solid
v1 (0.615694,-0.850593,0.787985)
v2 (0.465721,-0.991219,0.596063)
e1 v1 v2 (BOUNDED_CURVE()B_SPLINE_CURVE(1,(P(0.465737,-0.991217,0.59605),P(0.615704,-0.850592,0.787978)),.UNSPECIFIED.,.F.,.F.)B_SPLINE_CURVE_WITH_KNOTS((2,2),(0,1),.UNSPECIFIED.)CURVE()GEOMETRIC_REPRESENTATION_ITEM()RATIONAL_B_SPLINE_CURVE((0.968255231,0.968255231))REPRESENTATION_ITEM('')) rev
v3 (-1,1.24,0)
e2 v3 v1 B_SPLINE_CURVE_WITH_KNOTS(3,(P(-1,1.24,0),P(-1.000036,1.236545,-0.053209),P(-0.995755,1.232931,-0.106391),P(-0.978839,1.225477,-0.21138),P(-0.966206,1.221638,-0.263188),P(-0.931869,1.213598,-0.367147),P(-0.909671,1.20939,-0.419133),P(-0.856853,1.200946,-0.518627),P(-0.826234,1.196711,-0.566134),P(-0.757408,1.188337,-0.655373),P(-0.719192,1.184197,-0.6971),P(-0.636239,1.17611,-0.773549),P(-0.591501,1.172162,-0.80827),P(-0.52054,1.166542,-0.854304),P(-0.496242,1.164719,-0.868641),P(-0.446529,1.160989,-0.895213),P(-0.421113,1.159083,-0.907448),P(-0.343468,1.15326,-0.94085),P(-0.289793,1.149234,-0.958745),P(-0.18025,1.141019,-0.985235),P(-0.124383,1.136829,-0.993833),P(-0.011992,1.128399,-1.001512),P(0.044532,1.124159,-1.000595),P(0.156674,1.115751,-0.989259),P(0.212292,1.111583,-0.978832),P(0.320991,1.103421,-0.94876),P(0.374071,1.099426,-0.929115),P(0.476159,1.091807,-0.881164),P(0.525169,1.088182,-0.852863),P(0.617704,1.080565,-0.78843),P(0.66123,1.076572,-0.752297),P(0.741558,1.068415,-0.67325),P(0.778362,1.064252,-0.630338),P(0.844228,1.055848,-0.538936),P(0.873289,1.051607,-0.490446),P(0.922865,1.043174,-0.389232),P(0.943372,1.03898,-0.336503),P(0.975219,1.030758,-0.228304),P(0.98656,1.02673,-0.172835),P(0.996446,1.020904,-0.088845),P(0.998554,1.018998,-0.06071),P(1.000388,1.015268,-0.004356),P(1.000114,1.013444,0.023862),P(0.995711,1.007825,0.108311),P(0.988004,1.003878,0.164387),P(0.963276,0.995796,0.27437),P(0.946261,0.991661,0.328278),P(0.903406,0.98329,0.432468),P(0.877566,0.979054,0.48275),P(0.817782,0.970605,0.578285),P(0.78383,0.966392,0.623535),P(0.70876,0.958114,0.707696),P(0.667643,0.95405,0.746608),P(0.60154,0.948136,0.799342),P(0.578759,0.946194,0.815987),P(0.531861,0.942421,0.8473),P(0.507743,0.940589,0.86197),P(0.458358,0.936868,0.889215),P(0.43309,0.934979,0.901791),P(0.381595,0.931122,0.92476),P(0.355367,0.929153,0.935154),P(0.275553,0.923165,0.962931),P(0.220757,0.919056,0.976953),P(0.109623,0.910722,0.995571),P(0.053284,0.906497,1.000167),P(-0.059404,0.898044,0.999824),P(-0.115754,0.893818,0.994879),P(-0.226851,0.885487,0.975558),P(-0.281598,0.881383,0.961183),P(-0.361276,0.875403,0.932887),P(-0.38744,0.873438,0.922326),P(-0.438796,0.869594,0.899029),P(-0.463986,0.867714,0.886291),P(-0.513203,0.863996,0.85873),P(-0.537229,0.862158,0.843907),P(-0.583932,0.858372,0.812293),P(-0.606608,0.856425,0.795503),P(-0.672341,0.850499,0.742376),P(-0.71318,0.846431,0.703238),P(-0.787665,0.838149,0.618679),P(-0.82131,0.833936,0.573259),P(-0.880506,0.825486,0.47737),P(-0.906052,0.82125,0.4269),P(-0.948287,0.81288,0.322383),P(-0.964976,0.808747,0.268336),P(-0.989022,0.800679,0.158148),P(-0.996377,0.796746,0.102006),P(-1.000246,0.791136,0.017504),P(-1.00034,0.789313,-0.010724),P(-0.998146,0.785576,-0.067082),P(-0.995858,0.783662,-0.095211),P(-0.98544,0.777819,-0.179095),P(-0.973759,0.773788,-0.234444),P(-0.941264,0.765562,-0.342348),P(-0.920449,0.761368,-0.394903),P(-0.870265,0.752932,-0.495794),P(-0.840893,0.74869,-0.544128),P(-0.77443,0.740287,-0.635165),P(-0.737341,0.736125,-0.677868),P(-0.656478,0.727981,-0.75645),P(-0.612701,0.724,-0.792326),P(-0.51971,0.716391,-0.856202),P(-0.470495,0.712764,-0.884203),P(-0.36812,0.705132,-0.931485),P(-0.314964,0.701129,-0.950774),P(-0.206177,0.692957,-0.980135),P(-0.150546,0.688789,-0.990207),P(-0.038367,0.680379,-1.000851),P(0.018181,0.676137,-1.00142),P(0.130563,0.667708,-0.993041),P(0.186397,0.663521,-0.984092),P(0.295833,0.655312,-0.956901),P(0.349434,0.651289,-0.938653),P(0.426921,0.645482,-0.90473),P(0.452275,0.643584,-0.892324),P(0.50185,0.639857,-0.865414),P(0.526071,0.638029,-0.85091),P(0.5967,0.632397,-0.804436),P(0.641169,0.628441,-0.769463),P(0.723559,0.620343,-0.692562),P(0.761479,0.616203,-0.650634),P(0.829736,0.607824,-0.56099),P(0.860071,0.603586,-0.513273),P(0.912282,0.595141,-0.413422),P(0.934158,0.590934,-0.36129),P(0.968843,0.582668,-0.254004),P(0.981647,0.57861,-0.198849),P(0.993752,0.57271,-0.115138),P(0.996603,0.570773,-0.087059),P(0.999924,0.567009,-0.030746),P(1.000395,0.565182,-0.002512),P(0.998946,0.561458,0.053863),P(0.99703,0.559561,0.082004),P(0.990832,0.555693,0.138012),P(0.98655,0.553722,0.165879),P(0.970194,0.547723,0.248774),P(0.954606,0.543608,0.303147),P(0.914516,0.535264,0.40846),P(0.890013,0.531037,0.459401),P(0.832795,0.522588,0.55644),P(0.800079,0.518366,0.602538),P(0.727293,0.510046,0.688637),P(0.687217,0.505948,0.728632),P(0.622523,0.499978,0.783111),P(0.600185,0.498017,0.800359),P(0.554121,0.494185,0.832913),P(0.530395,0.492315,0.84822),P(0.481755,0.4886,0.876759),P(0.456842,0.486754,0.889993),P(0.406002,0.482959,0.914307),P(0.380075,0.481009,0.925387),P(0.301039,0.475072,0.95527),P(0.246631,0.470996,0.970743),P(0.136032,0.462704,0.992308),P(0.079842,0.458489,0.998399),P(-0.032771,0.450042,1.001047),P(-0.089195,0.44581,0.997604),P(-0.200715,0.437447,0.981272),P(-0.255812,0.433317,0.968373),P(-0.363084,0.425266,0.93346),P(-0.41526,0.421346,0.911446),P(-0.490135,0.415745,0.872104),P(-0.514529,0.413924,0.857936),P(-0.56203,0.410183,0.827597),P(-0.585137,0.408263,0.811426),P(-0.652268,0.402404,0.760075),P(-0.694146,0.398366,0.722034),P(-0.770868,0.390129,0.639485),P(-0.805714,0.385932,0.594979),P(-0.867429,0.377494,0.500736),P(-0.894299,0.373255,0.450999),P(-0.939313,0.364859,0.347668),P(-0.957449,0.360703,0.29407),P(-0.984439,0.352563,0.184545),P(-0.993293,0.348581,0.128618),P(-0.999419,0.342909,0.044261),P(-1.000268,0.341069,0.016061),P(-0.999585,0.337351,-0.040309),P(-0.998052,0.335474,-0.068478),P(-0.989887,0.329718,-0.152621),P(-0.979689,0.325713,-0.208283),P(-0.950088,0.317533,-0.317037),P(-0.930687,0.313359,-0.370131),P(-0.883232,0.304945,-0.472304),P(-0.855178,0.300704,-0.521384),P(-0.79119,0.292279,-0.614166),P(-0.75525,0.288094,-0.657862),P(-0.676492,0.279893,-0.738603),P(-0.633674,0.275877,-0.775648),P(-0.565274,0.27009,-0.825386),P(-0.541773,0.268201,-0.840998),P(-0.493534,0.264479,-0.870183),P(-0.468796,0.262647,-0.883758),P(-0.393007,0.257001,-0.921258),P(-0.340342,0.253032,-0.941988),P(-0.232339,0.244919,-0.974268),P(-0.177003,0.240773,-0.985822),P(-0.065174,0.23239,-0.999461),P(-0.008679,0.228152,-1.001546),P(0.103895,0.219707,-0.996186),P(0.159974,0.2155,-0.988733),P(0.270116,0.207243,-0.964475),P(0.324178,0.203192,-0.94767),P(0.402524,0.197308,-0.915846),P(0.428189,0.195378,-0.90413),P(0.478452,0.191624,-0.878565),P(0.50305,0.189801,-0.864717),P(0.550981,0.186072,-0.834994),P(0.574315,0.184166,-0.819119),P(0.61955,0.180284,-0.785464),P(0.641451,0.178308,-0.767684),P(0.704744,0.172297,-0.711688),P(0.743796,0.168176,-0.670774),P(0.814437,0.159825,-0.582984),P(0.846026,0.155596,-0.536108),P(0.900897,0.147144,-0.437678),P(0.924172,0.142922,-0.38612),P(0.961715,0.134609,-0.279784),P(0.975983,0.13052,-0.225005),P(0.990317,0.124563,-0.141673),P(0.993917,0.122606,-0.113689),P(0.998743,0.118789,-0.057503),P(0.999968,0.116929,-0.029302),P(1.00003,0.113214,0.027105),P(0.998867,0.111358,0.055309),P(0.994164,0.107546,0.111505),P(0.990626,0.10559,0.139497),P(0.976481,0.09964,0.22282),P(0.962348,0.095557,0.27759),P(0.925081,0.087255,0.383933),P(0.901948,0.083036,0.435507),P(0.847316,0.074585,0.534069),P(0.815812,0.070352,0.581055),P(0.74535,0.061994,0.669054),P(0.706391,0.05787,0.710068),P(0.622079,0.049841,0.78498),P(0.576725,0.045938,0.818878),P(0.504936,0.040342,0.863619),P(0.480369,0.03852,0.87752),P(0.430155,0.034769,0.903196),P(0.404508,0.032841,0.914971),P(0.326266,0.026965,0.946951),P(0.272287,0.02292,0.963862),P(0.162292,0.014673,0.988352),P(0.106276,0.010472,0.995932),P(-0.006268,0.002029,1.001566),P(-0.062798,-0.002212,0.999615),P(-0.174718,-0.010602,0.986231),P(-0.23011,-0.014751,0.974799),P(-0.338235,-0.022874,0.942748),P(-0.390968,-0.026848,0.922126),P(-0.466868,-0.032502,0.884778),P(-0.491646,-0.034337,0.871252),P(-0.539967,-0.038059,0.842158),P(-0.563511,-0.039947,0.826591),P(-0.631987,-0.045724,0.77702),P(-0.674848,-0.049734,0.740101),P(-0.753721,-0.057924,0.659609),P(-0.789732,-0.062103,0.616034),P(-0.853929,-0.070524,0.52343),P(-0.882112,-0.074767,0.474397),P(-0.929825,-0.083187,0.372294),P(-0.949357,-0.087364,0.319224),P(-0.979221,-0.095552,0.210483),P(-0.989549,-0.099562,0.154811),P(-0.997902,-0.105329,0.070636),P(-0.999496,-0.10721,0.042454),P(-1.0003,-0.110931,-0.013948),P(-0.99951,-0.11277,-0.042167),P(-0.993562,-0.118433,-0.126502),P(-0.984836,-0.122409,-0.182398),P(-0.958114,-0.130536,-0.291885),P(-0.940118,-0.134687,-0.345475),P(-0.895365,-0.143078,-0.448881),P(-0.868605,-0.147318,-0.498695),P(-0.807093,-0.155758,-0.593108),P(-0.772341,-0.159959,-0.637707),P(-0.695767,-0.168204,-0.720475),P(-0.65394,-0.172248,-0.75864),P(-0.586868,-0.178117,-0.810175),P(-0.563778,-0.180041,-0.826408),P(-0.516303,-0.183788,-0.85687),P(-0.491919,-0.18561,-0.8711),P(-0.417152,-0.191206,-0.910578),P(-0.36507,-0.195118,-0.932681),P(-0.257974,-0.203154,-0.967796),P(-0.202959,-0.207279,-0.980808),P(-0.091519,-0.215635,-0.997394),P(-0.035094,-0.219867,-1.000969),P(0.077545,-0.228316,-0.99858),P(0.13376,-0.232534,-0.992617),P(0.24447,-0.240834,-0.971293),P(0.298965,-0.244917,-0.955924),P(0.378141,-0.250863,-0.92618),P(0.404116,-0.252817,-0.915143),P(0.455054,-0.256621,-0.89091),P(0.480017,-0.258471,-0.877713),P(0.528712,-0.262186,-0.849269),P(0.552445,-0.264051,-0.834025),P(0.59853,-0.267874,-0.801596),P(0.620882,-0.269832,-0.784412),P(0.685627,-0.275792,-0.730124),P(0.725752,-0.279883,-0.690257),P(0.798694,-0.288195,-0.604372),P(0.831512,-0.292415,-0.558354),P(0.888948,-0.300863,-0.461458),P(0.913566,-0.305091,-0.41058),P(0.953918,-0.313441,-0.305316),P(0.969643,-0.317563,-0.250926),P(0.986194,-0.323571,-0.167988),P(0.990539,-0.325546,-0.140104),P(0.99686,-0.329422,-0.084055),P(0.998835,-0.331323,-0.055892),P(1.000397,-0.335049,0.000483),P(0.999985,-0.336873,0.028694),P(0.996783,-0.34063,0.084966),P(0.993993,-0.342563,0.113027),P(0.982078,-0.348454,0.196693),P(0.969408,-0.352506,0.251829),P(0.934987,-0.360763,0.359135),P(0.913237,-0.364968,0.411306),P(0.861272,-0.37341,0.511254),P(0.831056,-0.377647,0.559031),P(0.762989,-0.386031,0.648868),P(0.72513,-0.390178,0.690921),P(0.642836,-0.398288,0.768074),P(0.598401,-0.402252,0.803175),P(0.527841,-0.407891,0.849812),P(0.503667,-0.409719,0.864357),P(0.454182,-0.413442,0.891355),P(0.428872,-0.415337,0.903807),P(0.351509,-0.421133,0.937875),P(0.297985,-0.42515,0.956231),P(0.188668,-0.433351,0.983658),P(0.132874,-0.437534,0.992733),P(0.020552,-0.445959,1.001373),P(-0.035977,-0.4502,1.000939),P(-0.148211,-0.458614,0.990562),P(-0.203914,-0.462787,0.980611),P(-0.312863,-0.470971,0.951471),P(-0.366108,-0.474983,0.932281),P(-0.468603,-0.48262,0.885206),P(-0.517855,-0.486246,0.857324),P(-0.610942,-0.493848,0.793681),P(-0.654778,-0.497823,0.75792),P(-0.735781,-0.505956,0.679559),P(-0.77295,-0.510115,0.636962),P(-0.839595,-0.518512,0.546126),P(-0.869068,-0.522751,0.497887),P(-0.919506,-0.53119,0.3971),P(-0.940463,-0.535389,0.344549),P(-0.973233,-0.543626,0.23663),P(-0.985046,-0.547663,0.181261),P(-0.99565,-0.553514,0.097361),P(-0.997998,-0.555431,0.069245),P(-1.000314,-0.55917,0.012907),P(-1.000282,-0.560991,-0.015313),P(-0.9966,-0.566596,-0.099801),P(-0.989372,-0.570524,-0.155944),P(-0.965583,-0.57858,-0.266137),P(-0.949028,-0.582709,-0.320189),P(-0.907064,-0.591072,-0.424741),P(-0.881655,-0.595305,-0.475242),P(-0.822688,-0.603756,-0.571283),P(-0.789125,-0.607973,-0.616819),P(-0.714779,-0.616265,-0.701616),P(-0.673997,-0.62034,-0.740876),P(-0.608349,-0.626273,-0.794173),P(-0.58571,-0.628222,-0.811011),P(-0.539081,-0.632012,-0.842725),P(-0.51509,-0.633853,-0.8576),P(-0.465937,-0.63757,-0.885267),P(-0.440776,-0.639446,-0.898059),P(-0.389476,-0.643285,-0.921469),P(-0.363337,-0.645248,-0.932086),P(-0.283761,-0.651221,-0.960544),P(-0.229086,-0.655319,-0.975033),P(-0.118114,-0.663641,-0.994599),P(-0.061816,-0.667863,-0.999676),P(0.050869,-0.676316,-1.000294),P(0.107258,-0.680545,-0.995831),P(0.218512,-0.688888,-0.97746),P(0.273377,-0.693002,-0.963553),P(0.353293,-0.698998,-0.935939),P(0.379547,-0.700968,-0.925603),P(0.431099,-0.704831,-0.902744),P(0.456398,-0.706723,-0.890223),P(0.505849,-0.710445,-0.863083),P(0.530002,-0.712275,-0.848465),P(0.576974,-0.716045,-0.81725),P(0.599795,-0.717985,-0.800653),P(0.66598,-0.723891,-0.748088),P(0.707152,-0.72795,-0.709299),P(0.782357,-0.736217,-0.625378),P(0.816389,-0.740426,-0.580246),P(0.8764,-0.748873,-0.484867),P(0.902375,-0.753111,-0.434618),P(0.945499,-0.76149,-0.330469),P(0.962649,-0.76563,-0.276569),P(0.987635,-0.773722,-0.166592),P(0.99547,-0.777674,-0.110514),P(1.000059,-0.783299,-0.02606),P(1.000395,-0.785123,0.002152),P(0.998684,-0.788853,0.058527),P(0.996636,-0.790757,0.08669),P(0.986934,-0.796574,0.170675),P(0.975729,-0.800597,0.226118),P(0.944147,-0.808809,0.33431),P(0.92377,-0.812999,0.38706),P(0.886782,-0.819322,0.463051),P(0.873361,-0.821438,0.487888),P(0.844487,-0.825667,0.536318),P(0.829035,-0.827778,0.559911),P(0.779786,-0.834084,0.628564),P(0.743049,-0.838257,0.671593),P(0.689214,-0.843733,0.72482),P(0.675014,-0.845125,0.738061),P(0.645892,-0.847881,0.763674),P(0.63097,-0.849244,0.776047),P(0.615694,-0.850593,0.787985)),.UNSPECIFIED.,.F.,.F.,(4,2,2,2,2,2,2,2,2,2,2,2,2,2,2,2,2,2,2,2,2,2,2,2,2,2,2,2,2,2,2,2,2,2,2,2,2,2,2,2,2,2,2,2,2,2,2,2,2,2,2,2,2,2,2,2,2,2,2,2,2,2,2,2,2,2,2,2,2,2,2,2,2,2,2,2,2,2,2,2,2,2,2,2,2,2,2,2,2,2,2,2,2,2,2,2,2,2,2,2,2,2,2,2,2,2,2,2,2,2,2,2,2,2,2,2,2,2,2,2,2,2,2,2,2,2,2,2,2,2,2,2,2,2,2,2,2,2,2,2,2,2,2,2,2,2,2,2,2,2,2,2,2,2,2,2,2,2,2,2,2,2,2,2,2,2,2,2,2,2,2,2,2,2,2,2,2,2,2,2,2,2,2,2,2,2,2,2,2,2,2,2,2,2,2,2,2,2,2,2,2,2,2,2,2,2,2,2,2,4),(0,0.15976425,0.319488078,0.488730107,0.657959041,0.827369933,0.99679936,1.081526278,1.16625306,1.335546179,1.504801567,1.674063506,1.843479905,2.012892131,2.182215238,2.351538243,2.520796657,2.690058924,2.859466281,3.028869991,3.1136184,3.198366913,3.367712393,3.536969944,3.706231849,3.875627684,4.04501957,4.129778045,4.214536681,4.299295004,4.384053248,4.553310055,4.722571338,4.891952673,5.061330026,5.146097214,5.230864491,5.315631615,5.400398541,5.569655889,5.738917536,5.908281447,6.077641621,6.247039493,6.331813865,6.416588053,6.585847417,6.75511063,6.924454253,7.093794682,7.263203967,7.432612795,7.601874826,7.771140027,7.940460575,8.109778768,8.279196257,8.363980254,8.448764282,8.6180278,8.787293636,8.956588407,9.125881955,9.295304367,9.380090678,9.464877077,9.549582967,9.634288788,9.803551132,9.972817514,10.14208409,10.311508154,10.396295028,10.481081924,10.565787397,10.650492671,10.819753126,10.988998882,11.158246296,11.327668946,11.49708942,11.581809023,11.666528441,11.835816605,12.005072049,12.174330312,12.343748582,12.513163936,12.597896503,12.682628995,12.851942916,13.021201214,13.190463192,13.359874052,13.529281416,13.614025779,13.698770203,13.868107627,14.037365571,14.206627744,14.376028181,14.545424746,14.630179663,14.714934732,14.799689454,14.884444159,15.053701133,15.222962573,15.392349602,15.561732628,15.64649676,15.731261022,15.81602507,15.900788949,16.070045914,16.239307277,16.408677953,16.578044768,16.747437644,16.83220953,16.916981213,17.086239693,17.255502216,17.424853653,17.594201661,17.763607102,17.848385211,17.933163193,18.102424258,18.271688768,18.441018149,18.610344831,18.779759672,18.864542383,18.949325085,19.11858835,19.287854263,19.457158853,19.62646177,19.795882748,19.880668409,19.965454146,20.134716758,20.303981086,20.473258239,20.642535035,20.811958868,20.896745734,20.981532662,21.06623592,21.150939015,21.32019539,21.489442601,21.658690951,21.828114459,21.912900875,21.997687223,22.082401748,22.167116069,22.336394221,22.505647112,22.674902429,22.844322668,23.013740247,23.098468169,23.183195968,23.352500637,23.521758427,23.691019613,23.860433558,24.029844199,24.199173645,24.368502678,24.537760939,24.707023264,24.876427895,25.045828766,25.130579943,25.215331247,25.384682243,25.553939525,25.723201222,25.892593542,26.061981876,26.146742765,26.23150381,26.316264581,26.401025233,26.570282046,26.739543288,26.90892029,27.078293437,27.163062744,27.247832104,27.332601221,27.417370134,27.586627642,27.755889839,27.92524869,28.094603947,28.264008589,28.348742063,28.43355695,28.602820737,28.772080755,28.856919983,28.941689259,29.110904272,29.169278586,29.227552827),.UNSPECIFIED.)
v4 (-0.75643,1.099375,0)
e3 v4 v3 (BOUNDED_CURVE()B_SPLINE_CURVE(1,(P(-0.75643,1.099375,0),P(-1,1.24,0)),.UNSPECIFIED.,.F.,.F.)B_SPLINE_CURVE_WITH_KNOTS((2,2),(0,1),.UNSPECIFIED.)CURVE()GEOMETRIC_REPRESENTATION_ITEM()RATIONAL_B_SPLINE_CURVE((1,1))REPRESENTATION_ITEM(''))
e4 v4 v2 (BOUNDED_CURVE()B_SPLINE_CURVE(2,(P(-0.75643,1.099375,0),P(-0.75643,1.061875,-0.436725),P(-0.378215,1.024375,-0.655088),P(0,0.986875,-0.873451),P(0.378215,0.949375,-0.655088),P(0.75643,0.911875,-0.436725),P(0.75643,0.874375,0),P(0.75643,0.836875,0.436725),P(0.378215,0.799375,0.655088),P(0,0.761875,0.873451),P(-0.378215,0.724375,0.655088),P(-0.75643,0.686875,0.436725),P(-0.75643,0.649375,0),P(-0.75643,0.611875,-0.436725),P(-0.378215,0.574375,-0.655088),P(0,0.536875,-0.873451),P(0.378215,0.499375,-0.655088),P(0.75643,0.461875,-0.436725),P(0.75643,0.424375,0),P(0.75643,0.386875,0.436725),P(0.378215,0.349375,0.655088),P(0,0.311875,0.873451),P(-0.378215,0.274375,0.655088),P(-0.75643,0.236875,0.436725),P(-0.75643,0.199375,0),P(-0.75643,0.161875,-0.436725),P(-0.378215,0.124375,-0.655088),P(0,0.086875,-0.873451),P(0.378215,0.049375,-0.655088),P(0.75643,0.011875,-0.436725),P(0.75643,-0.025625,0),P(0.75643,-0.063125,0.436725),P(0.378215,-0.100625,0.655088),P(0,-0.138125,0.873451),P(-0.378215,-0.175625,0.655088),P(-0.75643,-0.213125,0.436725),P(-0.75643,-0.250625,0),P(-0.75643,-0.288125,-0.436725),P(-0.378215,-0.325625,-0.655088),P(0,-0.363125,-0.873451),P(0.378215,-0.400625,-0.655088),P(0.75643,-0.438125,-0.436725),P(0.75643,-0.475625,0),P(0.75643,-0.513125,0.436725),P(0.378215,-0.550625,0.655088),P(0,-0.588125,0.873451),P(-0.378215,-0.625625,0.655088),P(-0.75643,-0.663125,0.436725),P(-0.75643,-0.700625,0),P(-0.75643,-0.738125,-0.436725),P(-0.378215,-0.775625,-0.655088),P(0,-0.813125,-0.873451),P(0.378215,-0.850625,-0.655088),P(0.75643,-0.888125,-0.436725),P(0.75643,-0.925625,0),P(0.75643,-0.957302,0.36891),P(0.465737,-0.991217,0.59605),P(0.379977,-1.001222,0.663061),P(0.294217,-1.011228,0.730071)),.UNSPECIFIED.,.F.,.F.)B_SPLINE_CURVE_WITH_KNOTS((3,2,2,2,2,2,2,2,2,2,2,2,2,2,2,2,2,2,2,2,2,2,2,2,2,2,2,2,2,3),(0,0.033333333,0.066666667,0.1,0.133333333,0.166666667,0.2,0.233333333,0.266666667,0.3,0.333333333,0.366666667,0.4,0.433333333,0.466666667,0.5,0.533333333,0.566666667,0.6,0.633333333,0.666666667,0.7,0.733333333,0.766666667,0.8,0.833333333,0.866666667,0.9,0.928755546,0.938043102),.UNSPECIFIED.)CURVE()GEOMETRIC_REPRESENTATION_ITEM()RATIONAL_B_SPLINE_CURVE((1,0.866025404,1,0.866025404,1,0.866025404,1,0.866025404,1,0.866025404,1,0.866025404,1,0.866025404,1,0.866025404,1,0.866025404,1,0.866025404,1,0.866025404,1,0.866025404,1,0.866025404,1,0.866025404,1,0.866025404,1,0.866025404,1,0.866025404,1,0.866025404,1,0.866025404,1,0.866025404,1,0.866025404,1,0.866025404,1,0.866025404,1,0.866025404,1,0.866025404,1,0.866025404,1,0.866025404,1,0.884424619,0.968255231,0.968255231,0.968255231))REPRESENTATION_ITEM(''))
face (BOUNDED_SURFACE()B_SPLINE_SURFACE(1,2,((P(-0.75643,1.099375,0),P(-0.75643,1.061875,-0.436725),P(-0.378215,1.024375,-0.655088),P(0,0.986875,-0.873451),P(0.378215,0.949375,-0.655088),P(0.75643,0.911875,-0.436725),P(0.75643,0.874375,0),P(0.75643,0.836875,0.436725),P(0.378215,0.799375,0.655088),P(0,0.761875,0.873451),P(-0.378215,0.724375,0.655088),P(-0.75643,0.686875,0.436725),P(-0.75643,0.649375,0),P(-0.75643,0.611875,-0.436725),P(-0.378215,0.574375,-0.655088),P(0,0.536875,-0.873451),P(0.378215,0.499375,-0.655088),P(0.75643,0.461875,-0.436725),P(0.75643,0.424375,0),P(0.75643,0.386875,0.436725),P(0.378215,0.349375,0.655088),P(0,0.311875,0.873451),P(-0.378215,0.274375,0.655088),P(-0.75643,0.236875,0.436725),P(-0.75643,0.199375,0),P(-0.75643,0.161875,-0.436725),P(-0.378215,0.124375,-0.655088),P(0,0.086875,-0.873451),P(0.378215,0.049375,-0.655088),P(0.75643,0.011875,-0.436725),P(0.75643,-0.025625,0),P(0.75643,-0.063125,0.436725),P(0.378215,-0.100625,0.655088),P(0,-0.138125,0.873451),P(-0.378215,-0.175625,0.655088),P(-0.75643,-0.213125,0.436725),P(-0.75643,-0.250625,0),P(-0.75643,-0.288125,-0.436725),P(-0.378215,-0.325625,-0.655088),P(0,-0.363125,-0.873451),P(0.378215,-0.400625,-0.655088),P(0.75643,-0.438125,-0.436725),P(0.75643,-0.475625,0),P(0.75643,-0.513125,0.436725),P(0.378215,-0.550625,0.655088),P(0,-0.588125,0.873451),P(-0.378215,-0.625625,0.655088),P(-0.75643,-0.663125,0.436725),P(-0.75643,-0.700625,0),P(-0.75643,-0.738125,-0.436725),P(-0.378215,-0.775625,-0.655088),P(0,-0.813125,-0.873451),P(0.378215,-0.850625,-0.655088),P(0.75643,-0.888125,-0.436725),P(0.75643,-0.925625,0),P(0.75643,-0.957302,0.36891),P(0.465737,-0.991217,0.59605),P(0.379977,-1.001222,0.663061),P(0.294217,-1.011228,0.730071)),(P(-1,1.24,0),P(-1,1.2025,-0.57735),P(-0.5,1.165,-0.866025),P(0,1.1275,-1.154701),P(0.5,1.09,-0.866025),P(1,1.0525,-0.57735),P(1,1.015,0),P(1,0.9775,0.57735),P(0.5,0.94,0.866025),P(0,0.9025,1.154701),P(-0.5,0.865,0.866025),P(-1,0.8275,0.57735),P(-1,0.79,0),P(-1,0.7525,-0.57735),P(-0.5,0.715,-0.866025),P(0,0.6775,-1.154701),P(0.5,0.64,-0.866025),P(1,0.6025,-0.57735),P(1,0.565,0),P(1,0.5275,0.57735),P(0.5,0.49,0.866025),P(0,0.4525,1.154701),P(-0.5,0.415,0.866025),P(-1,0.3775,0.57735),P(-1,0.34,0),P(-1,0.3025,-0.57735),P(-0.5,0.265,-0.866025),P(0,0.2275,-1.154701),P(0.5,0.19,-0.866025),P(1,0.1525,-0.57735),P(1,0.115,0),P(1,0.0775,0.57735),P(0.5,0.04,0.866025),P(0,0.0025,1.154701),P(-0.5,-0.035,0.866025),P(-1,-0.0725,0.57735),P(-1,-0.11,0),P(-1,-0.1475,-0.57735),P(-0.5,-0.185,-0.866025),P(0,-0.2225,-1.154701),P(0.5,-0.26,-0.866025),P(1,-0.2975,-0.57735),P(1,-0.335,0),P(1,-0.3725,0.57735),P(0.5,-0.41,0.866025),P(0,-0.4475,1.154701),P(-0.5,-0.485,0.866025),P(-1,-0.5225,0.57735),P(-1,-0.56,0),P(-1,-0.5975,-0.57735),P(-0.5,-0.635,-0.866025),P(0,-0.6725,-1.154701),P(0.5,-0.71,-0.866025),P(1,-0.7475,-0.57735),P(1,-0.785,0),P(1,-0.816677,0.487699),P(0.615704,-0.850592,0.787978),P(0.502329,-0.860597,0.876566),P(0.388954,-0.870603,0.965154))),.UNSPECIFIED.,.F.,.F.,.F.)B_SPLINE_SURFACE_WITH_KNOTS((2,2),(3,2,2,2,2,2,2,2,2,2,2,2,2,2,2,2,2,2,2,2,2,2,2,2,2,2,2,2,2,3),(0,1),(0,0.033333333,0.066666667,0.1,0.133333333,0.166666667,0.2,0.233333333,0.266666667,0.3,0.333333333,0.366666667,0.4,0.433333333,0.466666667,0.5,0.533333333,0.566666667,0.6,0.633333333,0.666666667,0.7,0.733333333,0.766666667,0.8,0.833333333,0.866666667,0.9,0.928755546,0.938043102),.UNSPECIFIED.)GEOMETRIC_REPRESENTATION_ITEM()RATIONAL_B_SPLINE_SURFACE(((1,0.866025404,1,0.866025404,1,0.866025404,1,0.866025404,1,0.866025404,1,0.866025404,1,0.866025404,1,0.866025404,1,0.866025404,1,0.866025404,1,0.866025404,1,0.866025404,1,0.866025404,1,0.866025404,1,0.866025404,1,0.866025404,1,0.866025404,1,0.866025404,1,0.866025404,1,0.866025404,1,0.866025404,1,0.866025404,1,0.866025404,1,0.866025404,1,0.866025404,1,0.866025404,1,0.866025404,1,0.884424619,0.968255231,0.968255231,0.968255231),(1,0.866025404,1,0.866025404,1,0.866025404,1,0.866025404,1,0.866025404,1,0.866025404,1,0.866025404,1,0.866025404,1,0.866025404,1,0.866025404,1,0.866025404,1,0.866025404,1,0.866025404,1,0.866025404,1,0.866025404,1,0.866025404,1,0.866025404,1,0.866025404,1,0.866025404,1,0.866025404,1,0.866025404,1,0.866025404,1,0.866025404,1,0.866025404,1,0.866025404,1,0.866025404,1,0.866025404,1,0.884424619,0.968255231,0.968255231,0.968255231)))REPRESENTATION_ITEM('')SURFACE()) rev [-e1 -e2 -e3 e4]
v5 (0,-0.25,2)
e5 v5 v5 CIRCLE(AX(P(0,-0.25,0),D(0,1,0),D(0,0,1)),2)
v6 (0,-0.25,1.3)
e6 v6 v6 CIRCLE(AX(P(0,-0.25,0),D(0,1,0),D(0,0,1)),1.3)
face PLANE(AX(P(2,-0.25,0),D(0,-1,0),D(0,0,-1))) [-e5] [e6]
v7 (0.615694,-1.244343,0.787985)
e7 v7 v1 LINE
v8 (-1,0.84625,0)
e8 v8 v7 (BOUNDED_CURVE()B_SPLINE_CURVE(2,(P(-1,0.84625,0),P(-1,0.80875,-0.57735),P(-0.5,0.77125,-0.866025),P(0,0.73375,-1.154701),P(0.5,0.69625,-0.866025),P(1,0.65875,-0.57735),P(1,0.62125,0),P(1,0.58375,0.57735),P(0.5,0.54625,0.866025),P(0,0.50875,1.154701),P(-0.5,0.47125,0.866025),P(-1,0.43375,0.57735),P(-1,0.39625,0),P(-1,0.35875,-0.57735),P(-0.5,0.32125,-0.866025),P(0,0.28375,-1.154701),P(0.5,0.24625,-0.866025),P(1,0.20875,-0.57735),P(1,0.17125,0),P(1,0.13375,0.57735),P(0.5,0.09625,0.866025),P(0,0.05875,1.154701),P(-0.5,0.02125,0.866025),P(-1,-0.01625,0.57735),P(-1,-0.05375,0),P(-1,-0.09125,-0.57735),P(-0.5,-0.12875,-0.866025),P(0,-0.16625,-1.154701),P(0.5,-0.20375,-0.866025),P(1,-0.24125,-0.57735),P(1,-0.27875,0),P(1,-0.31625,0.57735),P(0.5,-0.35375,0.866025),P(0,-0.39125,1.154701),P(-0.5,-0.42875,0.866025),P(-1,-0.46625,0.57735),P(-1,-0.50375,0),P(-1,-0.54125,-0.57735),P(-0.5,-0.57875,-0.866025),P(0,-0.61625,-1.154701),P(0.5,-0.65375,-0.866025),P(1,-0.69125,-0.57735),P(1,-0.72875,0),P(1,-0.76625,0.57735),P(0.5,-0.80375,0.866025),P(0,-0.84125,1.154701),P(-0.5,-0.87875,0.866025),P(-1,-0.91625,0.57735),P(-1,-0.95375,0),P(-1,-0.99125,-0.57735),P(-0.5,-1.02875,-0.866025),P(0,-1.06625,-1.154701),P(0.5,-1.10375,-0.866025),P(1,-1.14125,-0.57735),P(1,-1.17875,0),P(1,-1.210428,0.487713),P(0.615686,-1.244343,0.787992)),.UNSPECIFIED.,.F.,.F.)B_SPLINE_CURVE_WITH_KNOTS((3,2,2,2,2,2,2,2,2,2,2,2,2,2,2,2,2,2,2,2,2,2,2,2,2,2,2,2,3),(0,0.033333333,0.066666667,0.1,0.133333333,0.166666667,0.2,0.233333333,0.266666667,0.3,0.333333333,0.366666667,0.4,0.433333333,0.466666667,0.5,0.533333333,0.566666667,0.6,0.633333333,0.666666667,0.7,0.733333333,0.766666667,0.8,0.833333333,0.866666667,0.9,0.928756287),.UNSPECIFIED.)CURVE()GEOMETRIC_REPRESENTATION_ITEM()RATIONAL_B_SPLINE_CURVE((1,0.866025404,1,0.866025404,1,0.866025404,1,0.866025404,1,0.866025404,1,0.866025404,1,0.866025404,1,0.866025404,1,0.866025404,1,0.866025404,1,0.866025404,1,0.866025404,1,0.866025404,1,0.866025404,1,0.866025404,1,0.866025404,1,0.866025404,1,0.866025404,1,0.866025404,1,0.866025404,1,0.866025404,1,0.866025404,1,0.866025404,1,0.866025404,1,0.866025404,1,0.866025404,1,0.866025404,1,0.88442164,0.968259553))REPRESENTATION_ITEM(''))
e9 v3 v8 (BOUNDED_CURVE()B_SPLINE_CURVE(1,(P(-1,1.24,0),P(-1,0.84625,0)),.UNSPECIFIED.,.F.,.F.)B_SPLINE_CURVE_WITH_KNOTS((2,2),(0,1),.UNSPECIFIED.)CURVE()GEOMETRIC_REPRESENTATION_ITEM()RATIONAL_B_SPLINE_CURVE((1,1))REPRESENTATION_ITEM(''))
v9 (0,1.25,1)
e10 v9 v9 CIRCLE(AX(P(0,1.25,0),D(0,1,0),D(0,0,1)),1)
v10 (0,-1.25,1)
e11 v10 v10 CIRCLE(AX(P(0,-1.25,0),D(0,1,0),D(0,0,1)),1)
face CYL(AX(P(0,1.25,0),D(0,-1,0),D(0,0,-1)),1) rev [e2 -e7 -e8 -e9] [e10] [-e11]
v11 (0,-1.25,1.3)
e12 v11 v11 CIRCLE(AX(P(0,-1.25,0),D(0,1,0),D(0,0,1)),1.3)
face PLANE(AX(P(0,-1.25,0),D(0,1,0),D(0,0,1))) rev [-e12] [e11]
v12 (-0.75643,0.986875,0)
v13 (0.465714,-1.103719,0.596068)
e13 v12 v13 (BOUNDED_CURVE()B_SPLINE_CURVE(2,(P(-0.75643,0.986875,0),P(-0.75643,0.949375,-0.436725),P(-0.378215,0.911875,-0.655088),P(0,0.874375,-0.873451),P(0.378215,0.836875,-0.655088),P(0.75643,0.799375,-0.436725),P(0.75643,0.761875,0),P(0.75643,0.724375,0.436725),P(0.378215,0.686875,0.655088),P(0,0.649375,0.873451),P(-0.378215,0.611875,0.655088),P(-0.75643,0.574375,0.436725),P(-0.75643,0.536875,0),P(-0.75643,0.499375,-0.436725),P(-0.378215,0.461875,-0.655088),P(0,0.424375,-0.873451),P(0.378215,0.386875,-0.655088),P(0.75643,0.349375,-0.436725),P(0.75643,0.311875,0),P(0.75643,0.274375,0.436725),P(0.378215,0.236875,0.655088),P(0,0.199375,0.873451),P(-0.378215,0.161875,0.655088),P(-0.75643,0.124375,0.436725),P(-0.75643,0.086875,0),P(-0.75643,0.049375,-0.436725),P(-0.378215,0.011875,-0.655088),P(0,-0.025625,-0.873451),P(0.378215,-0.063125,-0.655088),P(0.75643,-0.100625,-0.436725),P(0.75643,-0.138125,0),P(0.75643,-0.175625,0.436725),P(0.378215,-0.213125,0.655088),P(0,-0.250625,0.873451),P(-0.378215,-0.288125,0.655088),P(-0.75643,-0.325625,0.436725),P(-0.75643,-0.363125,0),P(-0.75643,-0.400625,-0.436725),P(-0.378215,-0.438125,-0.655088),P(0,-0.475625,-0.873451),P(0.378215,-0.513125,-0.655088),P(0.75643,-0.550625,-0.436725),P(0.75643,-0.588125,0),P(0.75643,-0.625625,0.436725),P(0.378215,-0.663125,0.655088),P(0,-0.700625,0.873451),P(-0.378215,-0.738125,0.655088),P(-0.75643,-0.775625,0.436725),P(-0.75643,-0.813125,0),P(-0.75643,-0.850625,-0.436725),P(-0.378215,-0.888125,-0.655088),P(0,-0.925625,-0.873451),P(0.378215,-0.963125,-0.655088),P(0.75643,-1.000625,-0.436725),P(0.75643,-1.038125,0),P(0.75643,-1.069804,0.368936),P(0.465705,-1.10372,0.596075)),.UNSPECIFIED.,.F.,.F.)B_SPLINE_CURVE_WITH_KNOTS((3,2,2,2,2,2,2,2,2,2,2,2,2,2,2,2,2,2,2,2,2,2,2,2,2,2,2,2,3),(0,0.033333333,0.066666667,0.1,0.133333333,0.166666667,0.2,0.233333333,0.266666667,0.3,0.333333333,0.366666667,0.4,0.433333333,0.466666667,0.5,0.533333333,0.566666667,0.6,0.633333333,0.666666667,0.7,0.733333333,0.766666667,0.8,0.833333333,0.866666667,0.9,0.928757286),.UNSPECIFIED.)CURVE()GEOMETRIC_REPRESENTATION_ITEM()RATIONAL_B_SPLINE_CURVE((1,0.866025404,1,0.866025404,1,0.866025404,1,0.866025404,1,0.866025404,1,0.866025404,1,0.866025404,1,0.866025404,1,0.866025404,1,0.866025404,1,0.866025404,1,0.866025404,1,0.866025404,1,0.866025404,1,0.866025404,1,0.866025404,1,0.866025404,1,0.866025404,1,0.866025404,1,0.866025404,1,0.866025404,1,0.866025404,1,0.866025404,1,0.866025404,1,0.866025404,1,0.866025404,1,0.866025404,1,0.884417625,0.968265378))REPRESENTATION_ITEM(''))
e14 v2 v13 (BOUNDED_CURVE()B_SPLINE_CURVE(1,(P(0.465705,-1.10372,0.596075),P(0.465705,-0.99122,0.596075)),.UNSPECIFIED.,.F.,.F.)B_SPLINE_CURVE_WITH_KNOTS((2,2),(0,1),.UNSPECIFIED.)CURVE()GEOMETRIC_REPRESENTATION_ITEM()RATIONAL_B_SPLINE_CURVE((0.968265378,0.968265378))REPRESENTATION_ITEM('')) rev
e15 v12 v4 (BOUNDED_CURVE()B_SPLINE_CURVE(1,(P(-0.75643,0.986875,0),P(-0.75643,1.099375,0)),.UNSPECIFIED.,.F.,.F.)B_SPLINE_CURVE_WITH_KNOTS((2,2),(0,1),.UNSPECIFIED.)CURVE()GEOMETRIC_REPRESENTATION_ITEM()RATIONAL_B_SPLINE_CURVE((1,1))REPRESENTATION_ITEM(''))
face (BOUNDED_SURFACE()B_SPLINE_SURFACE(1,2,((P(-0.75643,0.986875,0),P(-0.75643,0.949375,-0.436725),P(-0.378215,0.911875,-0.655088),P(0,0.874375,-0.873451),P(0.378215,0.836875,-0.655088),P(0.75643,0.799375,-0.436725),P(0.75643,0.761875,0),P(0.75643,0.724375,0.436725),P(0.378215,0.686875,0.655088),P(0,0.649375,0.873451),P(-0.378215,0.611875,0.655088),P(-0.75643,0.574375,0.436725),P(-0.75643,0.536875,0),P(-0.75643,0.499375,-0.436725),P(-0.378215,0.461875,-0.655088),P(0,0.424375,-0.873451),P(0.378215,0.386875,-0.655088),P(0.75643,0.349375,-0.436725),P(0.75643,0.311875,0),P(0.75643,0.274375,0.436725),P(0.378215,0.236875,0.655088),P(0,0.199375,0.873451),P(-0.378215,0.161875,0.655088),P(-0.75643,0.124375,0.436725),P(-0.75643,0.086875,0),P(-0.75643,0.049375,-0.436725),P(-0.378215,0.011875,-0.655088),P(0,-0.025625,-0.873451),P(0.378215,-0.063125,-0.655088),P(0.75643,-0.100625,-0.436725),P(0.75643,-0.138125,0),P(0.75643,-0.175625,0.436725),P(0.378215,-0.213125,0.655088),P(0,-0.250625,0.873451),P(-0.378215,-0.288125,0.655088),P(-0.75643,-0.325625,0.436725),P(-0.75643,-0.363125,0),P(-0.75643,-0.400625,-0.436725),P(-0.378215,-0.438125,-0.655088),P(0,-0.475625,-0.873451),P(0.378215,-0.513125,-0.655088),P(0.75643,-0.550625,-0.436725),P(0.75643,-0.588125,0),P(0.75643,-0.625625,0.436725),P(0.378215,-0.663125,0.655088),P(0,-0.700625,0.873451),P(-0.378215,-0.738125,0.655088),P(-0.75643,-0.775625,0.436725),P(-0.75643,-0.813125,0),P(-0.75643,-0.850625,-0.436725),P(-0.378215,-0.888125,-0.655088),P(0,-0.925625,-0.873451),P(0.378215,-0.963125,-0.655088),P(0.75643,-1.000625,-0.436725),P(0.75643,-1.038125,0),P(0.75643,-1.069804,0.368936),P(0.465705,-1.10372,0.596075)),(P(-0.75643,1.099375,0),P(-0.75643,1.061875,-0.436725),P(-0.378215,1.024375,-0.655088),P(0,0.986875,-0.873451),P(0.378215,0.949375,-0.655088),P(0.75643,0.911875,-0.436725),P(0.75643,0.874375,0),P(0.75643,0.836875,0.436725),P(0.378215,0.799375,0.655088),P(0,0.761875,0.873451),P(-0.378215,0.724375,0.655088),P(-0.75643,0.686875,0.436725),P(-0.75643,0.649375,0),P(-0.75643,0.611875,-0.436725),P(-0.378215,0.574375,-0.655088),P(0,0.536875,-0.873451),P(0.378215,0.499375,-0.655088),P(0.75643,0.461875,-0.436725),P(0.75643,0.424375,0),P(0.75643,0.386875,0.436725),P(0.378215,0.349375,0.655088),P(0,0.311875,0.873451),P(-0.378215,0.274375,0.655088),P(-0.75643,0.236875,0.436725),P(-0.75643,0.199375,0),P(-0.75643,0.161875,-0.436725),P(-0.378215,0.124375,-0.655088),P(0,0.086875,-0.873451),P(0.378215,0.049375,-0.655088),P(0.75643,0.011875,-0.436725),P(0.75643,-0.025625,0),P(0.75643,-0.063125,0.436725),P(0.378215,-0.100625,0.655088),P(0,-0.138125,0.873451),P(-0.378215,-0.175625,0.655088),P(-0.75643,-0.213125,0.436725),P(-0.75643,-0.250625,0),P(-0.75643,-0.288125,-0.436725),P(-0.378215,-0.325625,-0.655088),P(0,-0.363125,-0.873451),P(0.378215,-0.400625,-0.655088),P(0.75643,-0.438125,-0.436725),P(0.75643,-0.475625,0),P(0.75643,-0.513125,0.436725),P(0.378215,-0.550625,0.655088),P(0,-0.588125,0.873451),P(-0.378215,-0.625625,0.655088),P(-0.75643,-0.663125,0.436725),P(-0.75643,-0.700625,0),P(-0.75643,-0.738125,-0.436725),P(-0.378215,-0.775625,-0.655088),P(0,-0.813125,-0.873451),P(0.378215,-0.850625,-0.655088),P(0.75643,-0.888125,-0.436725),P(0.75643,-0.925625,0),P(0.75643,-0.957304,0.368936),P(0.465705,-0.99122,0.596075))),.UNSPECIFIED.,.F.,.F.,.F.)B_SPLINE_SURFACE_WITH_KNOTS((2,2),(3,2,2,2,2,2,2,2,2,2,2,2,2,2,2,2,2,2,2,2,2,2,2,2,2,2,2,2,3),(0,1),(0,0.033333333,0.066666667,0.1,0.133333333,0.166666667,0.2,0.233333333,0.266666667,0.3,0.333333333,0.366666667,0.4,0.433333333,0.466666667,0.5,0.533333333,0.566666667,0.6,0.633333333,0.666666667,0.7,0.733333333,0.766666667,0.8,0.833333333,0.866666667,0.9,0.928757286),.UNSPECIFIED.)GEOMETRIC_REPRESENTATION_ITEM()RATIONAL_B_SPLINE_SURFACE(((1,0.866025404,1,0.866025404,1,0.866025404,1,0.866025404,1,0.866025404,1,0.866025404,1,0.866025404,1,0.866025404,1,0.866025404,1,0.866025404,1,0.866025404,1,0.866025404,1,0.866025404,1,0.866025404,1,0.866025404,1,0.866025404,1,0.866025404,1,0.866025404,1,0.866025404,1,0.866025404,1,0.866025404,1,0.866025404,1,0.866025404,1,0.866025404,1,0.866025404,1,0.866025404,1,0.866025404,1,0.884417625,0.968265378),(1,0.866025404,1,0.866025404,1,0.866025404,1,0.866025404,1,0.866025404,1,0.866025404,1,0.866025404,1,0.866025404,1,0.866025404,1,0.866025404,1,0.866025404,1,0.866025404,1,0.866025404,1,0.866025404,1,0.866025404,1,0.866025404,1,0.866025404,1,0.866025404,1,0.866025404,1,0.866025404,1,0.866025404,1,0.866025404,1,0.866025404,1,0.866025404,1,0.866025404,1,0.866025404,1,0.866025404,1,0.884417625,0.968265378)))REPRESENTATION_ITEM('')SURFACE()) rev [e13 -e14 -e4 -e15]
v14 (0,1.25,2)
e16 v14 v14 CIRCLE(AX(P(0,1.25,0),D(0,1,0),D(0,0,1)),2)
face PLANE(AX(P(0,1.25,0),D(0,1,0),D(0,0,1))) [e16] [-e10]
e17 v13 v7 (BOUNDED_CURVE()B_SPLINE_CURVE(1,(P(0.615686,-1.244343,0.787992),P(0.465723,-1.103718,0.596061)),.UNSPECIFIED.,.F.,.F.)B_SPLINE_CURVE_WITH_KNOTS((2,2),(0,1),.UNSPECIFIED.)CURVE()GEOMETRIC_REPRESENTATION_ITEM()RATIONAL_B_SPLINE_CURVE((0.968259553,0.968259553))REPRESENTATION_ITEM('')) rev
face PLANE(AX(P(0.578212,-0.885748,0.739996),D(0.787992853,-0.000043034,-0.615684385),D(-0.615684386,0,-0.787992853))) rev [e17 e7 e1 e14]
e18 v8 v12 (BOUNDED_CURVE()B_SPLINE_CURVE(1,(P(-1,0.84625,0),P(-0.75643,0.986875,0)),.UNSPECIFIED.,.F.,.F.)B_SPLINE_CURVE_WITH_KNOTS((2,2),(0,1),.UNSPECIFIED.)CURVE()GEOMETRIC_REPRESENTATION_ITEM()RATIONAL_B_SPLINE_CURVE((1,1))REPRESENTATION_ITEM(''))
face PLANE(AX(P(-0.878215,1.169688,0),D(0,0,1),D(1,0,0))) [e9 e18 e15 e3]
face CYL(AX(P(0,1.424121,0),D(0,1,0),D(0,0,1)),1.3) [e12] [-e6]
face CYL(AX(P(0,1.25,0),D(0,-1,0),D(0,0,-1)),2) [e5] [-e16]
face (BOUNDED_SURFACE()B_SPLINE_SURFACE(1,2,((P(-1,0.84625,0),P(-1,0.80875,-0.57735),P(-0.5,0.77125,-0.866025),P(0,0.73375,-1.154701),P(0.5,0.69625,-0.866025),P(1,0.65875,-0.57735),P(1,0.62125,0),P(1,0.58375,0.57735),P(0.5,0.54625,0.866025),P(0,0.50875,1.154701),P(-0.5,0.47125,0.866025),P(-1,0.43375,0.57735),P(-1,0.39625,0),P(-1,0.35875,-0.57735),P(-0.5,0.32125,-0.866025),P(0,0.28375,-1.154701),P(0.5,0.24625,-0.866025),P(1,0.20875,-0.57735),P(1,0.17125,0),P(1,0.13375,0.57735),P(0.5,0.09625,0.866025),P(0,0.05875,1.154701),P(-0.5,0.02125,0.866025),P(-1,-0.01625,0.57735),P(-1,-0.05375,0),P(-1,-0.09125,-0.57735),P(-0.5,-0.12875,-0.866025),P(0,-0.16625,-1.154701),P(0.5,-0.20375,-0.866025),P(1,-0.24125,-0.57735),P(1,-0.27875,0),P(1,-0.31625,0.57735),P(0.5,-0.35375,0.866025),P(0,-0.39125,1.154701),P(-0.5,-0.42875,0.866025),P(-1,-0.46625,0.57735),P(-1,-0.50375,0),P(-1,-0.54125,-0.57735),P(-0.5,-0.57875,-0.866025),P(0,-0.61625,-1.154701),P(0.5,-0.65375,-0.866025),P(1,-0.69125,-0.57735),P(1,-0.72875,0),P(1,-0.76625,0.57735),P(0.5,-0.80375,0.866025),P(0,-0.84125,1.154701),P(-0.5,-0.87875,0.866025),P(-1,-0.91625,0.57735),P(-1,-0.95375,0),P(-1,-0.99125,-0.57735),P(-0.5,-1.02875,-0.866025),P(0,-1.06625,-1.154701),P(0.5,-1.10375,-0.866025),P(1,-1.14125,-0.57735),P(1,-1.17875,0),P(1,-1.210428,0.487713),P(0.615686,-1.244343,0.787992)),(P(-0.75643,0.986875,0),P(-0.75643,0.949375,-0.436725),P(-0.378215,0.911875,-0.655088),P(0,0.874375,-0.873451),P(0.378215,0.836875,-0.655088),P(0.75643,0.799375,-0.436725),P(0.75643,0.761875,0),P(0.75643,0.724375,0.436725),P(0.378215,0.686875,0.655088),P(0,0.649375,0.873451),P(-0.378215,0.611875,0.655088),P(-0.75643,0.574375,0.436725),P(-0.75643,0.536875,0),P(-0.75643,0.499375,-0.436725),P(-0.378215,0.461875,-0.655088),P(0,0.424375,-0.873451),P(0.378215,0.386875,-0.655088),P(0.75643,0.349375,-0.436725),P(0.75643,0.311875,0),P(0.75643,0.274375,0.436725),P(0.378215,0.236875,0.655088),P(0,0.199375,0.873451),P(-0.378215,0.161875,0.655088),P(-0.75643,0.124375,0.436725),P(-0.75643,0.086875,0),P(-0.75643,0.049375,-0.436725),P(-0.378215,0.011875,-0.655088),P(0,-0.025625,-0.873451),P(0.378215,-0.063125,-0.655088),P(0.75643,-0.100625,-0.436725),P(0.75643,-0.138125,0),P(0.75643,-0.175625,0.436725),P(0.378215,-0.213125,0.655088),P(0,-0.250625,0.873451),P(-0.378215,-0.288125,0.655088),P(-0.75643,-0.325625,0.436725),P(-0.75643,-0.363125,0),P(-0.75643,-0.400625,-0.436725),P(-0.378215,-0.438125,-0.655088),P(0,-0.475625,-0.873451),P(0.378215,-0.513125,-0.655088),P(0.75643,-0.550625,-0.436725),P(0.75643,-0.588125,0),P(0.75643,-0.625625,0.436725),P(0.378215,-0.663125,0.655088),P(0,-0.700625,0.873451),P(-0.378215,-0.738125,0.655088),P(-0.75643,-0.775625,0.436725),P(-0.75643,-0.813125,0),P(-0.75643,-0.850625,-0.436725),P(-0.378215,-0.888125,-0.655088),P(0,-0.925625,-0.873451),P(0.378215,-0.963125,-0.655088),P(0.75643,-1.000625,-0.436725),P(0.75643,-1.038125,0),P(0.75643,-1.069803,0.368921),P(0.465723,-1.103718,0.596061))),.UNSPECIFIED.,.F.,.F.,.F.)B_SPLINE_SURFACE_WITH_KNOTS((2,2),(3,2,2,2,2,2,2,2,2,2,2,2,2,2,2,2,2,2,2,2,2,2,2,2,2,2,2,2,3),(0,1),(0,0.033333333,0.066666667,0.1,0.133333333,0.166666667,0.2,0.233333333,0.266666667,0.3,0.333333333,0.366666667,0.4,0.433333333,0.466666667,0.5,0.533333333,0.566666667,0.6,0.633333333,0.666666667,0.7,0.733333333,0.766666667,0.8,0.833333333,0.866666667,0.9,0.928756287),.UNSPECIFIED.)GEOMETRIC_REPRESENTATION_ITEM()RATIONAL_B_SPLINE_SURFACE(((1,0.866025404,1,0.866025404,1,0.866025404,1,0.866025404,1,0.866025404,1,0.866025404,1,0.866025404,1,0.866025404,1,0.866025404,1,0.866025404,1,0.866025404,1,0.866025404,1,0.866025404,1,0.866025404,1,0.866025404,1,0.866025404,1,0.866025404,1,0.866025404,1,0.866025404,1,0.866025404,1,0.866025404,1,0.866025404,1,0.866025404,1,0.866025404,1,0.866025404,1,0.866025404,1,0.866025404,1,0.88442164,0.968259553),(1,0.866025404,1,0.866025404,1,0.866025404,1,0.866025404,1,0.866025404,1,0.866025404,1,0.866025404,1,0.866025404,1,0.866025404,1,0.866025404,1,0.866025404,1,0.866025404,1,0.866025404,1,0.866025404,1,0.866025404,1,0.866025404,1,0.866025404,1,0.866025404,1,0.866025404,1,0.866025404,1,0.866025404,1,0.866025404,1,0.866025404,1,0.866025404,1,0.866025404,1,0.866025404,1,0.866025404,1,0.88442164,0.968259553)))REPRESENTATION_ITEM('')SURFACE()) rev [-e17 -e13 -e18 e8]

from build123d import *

# Parameters (mm, degrees)
BASES_R       = 2
BASES_R_2     = 1
BASE_DEPTH    = 1.25
THREAD1_PITCH = 0.45
SKETCH1_W     = 0.7
SKETCH1_H     = 1


with BuildPart() as part:
    # BaseS → Base (new, symmetric)
    with BuildSketch(Plane(origin=(0, 0, 0), x_dir=(1, 0, 0), z_dir=(0, 1, 0))):
        with Locations(Location((0, 0, 0), (0, 0, 270))):
            Circle(BASES_R)
        with Locations(Location((0, 0, 0), (0, 0, 270))):
            Circle(BASES_R_2, mode=Mode.SUBTRACT)
    extrude(amount=BASE_DEPTH, both=True)

    # Thread1: the profile of Thread Profile1 profile screwed along a right-hand helix of 4.644444 turns, 6 arcs to a turn; built about Z, then put on its axis
    thread1_z = Axis((0, 0, 0), (0, 0, 1))
    thread1_corners = [(1.0003, 0, -0.000173205), (1.0003, 0, 0.393923204), (0.756430356, 0, 0.253124999), (0.756430356, 0, 0.140624999)]
    with BuildLine(mode=Mode.PRIVATE) as thread1_profile:
        Line(thread1_corners[0], thread1_corners[1])
        Line(thread1_corners[1], thread1_corners[2])
        Line(thread1_corners[2], thread1_corners[3])
        Line(thread1_corners[3], thread1_corners[0])
    thread1_cap = Face(thread1_profile.wire())
    thread1_turn_angles = [0, 30, 60, 90, 120, 150, 180, 210, 240, 270, 300, 330, 360]
    thread1_turn_weights = [1, 0.8660254037844387, 1, 0.8660254037844387, 1, 0.8660254037844387, 1, 0.8660254037844387, 1, 0.8660254037844387, 1, 0.8660254037844387, 1]
    thread1_turn_rails = [Edge.make_bspline([Vector(p[0], p[1], 0).rotate(thread1_z, thread1_turn_angles[k]) / thread1_turn_weights[k] + Vector(0, 0, p[2] + THREAD1_PITCH * thread1_turn_angles[k] / 360) for k in range(13)], [0, 0, 0, 1, 1, 2, 2, 3, 3, 4, 4, 5, 5, 6, 6, 6], 2, thread1_turn_weights) for p in thread1_corners]
    thread1_turn_sides = [Face.make_surface_from_curves(thread1_turn_rails[p[0]], thread1_turn_rails[p[1]]) for p in [(0, 1), (1, 2), (2, 3), (3, 0)]]
    thread1_last_angles = [1440, 1470, 1500, 1530, 1560, 1590, 1620, 1646, 1672]
    thread1_last_weights = [1, 0.8660254037844387, 1, 0.8660254037844387, 1, 0.8660254037844387, 1, 0.8987940462991653, 1]
    thread1_last_rails = [Edge.make_bspline([Vector(p[0], p[1], 0).rotate(thread1_z, thread1_last_angles[k]) / thread1_last_weights[k] + Vector(0, 0, p[2] + THREAD1_PITCH * thread1_last_angles[k] / 360) for k in range(9)], [0, 0, 0, 1, 1, 2, 2, 3, 3, 4, 4, 4], 2, thread1_last_weights) for p in thread1_corners]
    thread1_last_sides = [Face.make_surface_from_curves(thread1_last_rails[p[0]], thread1_last_rails[p[1]]) for p in [(0, 1), (1, 2), (2, 3), (3, 0)]]
    thread1 = Plane(origin=(0, 1.24, 0), x_dir=(-1, 0, 0), z_dir=(0, -1, 0)) * Solid(Shell([*[p.moved(Location((0, 0, THREAD1_PITCH * i))) for i in range(4) for p in thread1_turn_sides], *thread1_last_sides, thread1_cap, thread1_cap.rotate(thread1_z, 1672).moved(Location((0, 0, THREAD1_PITCH * 1672 / 360)))]))
    add(thread1)

    # Sketch1 → Cut-Revolve1 (revolve, cut)
    with BuildSketch(Plane.XY, mode=Mode.PRIVATE) as cut_revolve1_sk:
        with Locations((1.65, -0.75)):
            Rectangle(SKETCH1_W, SKETCH1_H)
    revolve(cut_revolve1_sk.sketch.rotate(Axis((0, 1.424121105, 0), (0, -1, 0)), 90), axis=Axis((0, 1.424121105, 0), (0, -1, 0)), mode=Mode.SUBTRACT)


solid = part.part
